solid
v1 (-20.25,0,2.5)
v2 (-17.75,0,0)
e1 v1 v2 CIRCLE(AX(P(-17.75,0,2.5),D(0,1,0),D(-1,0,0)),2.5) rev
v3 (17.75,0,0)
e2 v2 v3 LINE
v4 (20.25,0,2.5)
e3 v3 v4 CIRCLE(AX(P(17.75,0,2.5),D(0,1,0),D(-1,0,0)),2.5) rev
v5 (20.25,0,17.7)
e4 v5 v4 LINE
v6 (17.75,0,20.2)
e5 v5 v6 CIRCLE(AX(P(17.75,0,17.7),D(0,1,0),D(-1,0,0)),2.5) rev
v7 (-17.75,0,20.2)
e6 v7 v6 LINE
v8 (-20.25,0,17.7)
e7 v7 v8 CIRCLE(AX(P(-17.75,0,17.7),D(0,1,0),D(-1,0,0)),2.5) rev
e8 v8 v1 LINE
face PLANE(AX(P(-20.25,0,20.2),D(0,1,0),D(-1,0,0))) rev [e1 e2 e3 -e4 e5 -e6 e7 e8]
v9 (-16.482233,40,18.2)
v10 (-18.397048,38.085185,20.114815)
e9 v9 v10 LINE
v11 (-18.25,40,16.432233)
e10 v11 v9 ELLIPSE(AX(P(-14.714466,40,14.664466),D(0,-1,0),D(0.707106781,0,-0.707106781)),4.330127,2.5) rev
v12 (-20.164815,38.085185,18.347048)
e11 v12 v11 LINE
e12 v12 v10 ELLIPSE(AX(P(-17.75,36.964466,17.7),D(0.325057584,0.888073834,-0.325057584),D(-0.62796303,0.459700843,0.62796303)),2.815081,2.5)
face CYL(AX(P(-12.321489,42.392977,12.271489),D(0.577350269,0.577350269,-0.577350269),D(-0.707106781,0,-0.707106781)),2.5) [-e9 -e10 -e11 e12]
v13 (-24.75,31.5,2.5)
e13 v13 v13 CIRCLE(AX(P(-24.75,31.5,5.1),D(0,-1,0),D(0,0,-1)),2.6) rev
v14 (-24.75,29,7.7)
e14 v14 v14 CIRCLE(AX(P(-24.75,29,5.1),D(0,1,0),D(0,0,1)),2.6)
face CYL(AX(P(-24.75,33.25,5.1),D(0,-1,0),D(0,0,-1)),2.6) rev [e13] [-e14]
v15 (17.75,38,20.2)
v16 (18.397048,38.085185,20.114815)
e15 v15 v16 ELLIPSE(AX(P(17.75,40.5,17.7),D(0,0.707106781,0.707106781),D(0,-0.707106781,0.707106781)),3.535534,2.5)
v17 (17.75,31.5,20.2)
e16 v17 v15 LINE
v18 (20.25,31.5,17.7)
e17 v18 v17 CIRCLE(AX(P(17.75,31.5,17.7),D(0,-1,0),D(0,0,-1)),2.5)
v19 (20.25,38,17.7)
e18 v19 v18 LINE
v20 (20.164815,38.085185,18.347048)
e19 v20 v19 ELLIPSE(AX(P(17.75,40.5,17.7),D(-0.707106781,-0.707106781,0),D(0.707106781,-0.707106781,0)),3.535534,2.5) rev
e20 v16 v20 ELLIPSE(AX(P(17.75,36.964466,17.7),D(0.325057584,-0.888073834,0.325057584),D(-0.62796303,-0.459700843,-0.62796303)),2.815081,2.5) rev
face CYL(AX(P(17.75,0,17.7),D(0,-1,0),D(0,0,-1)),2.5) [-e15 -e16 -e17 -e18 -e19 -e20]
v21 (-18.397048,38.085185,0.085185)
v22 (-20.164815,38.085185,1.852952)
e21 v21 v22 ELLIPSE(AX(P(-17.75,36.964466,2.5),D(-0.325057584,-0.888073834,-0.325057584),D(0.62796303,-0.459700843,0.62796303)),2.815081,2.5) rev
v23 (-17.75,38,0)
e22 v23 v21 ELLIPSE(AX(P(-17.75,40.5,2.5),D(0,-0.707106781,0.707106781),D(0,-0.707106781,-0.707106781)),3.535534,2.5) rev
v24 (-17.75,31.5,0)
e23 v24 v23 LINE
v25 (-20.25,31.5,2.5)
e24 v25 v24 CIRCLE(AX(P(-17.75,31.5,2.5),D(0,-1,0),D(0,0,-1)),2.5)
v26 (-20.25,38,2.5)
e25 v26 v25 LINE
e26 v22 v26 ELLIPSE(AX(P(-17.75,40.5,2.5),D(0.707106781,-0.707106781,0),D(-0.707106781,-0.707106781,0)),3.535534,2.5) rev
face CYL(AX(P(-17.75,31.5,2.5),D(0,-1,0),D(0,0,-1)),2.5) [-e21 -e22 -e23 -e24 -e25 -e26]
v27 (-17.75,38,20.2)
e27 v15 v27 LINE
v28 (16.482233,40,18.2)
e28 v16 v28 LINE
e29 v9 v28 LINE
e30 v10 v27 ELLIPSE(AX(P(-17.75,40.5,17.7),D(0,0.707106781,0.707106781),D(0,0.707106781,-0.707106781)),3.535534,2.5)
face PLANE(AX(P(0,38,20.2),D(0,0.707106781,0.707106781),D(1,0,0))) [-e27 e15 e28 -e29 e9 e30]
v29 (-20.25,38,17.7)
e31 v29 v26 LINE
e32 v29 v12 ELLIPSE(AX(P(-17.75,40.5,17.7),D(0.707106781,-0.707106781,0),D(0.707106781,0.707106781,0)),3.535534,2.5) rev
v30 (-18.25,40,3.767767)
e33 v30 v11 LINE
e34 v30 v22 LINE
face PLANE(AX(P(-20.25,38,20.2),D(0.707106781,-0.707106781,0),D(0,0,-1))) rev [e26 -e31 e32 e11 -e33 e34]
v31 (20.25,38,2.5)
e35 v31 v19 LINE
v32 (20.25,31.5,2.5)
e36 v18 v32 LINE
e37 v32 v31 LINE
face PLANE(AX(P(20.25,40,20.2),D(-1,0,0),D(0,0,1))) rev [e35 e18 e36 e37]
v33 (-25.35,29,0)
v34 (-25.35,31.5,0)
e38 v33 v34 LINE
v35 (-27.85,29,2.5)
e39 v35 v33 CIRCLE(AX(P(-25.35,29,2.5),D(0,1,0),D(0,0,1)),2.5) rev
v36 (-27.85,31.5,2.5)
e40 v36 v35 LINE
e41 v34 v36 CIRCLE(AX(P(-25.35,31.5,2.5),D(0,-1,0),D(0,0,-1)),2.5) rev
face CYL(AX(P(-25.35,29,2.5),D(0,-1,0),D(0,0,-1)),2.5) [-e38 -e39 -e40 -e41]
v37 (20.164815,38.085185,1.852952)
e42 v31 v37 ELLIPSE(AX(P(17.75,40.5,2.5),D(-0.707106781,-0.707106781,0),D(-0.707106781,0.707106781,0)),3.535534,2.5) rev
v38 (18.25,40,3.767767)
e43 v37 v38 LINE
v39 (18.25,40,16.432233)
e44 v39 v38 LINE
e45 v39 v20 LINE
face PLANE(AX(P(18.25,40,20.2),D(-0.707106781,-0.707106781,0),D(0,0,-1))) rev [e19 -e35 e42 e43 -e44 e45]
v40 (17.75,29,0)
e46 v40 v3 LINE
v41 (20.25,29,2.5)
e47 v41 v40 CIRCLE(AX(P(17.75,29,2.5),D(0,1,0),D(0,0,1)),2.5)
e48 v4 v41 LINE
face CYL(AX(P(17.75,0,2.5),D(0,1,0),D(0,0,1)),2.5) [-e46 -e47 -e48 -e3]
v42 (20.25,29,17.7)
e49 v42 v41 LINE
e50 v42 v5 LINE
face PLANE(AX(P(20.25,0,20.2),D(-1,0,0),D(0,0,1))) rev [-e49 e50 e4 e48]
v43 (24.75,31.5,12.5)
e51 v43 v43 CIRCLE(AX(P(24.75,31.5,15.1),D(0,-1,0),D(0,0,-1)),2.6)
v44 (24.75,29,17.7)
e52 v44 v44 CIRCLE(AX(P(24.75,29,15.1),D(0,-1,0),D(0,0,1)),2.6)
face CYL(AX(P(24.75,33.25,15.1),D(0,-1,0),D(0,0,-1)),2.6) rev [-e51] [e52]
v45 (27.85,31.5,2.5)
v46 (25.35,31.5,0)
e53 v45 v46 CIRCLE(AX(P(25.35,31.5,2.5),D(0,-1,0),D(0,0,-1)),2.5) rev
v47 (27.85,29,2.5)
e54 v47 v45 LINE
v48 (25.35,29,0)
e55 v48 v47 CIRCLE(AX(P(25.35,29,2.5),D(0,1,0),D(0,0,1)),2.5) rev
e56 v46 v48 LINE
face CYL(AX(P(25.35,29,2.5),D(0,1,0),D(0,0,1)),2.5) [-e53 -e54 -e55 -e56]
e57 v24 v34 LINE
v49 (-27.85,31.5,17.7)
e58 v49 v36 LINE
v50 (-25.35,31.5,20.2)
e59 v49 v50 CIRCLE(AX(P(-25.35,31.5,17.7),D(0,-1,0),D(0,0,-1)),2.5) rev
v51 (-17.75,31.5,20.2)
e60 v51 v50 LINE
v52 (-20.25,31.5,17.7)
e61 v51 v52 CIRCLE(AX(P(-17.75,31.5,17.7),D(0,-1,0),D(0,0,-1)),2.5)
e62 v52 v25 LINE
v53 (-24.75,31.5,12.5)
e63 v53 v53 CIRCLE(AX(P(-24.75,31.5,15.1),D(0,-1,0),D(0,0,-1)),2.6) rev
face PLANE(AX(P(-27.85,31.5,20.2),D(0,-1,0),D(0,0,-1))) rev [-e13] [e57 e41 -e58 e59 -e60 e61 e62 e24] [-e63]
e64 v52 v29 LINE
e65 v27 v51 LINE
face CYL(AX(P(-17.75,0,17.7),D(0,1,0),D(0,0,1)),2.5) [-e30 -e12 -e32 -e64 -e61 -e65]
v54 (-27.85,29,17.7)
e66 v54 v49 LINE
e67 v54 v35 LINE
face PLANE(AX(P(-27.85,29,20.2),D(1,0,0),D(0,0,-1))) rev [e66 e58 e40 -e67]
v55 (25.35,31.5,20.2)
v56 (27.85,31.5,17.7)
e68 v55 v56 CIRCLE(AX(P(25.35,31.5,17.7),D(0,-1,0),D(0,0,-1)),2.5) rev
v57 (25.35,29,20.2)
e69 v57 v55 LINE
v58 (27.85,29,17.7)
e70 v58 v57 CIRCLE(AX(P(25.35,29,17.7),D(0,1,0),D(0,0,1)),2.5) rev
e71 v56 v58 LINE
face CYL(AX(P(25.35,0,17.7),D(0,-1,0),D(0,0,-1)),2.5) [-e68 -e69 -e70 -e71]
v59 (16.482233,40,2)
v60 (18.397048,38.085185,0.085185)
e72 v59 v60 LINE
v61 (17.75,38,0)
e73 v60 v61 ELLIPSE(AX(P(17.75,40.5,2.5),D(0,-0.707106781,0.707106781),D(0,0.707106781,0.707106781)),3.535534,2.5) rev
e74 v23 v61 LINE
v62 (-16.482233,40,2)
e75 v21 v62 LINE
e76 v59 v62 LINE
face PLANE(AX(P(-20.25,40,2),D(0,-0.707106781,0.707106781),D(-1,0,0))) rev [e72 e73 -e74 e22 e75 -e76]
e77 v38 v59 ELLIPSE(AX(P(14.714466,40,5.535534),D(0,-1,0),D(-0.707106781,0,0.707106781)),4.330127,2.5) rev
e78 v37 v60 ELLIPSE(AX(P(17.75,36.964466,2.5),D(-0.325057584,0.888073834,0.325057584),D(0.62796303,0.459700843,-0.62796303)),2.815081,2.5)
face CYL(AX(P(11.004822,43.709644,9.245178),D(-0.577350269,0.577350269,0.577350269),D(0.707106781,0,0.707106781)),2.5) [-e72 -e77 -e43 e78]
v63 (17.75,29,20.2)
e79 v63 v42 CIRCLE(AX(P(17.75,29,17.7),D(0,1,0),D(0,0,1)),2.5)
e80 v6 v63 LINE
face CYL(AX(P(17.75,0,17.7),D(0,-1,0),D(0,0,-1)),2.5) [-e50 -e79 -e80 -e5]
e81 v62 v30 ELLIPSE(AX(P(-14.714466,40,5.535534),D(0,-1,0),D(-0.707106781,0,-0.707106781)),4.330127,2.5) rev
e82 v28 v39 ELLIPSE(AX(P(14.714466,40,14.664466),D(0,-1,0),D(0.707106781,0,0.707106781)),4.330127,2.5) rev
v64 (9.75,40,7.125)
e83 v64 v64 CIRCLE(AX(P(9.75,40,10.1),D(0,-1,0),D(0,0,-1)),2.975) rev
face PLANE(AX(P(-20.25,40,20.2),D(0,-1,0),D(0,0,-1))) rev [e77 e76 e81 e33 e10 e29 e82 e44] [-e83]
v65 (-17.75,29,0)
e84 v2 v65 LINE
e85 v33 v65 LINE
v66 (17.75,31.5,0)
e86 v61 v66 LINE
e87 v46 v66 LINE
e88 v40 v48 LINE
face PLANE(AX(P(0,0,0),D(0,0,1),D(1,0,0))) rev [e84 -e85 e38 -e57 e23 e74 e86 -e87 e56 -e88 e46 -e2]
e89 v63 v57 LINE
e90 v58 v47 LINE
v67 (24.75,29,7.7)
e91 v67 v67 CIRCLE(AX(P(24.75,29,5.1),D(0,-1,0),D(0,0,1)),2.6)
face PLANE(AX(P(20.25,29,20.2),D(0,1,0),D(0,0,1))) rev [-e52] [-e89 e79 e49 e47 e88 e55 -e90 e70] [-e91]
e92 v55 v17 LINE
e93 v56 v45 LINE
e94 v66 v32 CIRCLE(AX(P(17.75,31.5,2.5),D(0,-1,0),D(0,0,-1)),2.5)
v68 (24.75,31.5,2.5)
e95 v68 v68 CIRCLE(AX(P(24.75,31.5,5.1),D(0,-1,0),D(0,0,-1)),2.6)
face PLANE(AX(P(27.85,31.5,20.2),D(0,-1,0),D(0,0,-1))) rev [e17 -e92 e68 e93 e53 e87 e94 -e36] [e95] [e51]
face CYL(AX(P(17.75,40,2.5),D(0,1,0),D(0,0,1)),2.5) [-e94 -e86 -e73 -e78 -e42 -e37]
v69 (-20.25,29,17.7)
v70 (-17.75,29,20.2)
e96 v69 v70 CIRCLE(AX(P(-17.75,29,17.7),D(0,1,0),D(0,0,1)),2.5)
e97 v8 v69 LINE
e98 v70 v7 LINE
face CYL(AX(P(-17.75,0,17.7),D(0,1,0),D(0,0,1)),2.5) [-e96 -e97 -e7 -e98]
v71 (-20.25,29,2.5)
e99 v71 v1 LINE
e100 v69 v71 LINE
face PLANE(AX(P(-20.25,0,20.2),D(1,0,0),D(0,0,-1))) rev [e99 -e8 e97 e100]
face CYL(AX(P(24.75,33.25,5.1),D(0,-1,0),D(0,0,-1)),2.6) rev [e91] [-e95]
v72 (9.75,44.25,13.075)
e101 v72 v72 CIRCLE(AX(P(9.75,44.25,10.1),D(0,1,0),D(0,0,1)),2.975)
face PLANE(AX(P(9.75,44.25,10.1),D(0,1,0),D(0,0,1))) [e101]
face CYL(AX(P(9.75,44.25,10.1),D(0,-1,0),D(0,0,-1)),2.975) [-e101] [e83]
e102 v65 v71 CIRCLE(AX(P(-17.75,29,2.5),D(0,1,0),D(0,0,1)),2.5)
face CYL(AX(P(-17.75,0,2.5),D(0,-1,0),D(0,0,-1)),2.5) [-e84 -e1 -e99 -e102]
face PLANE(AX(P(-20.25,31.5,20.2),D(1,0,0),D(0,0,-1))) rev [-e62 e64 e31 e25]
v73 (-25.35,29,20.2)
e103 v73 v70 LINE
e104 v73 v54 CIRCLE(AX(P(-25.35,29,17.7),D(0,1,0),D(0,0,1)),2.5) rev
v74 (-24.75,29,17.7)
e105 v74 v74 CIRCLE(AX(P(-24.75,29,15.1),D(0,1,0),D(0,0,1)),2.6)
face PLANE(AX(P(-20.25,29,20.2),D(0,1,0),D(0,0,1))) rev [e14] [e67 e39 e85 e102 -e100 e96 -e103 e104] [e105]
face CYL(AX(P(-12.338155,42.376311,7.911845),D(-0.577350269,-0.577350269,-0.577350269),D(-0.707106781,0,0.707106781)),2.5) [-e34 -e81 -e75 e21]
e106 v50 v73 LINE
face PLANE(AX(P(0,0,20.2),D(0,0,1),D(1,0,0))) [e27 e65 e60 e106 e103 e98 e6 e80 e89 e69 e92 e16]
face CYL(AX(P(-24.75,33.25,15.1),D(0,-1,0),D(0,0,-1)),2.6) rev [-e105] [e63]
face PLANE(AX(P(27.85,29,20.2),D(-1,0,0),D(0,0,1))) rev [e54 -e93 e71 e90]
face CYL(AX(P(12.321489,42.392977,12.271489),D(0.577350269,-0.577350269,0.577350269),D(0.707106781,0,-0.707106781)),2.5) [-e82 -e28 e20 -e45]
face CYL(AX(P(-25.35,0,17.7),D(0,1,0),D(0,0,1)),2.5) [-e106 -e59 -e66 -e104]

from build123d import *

# Parameters (mm, degrees)
BOSS_EXTRUDE1_DEPTH = 20.2
SKETCH2_R           = 2.975
BOSS_EXTRUDE2_DEPTH = 4.25
CUT_EXTRUDE1_START  = 29
SKETCH3_R           = 2.6
CUT_EXTRUDE1_DEPTH  = 4.25
CHAMFER1_SIZE       = 2
FILLET1_R           = 2.5


with BuildPart() as part:
    # Sketch1 → Boss-Extrude1 (new body)
    with BuildSketch(Plane.XY):
        Polygon((-20.25, 0), (20.25, 0), (20.25, 29), (27.85, 29), (27.85, 31.5), (20.25, 31.5), (20.25, 40), (-20.25, 40), (-20.25, 31.5), (-27.85, 31.5), (-27.85, 29), (-20.25, 29), align=None)
    extrude(amount=BOSS_EXTRUDE1_DEPTH)

    # Sketch2 → Boss-Extrude2 (add)
    with BuildSketch(Plane(origin=(0, 40, 0), x_dir=(1, 0, 0), z_dir=(0, 1, 0))):
        with Locations(Location((9.75, -10.1, 0), (0, 0, 90))):
            Circle(SKETCH2_R)
    extrude(amount=BOSS_EXTRUDE2_DEPTH)

    # Sketch3 → Cut-Extrude1 (cut)
    with BuildSketch(Plane(origin=(0, 0, 0), x_dir=(1, 0, 0), z_dir=(0, 1, 0)).offset(CUT_EXTRUDE1_START)):
        with Locations(Location((-24.75, -5.1, 0), (0, 0, 90))):
            Circle(SKETCH3_R)
        with Locations(Location((-24.75, -15.1, 0), (0, 0, 90))):
            Circle(SKETCH3_R)
    cut_extrude1 = extrude(amount=CUT_EXTRUDE1_DEPTH, mode=Mode.SUBTRACT)

    # Mirror1: Cut-Extrude1 across plane
    add(cut_extrude1.mirror(Plane(origin=(0, 0, 0), x_dir=(0, 0, 1), z_dir=(1, 0, 0))), mode=Mode.SUBTRACT)

    # Chamfer1
    chamfer1_edges = [part.edges().sort_by_distance(p)[0] for p in [
        (0, 40, 0),
        (0, 40, 20.2),
        (-20.25, 40, 10.1),
        (20.25, 40, 10.1),
    ]]
    chamfer(chamfer1_edges, length=CHAMFER1_SIZE)

    # Fillet1
    # the kernel refuses this fillet: 2.5 mm, written as the material it takes off along each edge
    with BuildSketch(Plane(origin=(20.25, -6.25, 0), x_dir=(-1, 0, 0), z_dir=(0, 1, 0)), Plane(origin=(-20.25, 29, 0), x_dir=(1, 0, 0), z_dir=(0, -1, 0)), Plane(origin=(-20.25, 29, 20.2), x_dir=(0, 0, -1), z_dir=(0, -1, 0)), Plane(origin=(20.25, -6.25, 20.2), x_dir=(0, 0, -1), z_dir=(0, 1, 0))) as fillet1_piece_1:
        with BuildLine():
            CenterArc((FILLET1_R, FILLET1_R), FILLET1_R, 180, 90)
            Line((0, FILLET1_R), (0, 0))
            Line((0, 0), (FILLET1_R, 0))
        make_face()
    extrude(amount=35.25, mode=Mode.SUBTRACT)
    with BuildSketch(Plane(origin=(20.25, -6.25, 0), x_dir=(-1, 0, 0), z_dir=(0, 1, 0))) as fillet1_piece_2_section:
        with BuildLine():
            CenterArc((FILLET1_R, FILLET1_R), FILLET1_R, 180, 90)
            Line((0, FILLET1_R), (0, 0))
            Line((0, 0), (FILLET1_R, 0))
        make_face()
    fillet1_piece_2 = extrude(amount=41.5, mode=Mode.PRIVATE)
    fillet1_piece_2 = split(fillet1_piece_2, bisect_by=Plane(origin=(19.684012214, 31.5, 0.565987786), z_dir=(0, 1, 0)), keep=Keep.TOP, mode=Mode.PRIVATE)
    add(fillet1_piece_2, mode=Mode.SUBTRACT)
    with BuildSketch(Plane(origin=(-20.25, 35.25, 0), x_dir=(1, 0, 0), z_dir=(0, -1, 0))) as fillet1_piece_3_section:
        with BuildLine():
            CenterArc((FILLET1_R, FILLET1_R), FILLET1_R, 180, 90)
            Line((0, FILLET1_R), (0, 0))
            Line((0, 0), (FILLET1_R, 0))
        make_face()
    fillet1_piece_3 = extrude(amount=41.5, mode=Mode.PRIVATE)
    fillet1_piece_3 = split(fillet1_piece_3, bisect_by=Plane(origin=(-19.684012214, 31.5, 0.565987786), z_dir=(0, 1, 0)), keep=Keep.TOP, mode=Mode.PRIVATE)
    add(fillet1_piece_3, mode=Mode.SUBTRACT)
    with BuildSketch(Plane(origin=(-27.85, 37.75, 0), x_dir=(1, 0, 0), z_dir=(0, -1, 0)), Plane(origin=(27.85, 22.75, 0), x_dir=(-1, 0, 0), z_dir=(0, 1, 0)), Plane(origin=(-27.85, 37.75, 20.2), x_dir=(0, 0, -1), z_dir=(0, -1, 0)), Plane(origin=(27.85, 22.75, 20.2), x_dir=(0, 0, -1), z_dir=(0, 1, 0))) as fillet1_piece_4:
        with BuildLine():
            CenterArc((FILLET1_R, FILLET1_R), FILLET1_R, 180, 90)
            Line((0, FILLET1_R), (0, 0))
            Line((0, 0), (FILLET1_R, 0))
        make_face()
    extrude(amount=15, mode=Mode.SUBTRACT)
    with BuildSketch(Plane(origin=(20.25, 25.25, 0), x_dir=(-1, 0, 0), z_dir=(0, 1, 0))) as fillet1_piece_5_section:
        with BuildLine():
            CenterArc((FILLET1_R, FILLET1_R), FILLET1_R, 180, 90)
            Line((0, FILLET1_R), (0, 0))
            Line((0, 0), (FILLET1_R, 0))
        make_face()
    fillet1_piece_5 = extrude(amount=19, mode=Mode.PRIVATE)
    fillet1_piece_5 = split(fillet1_piece_5, bisect_by=Plane(origin=(19.684012214, 29, 0.565987786), z_dir=(0, -1, 0)), keep=Keep.TOP, mode=Mode.PRIVATE)
    add(fillet1_piece_5, mode=Mode.SUBTRACT)
    with BuildSketch(Plane(origin=(20.25, 31.5, 0), x_dir=(-1, 0, 0), z_dir=(0, 1, 0)), Plane(origin=(20.25, 31.5, 20.2), x_dir=(0, 0, -1), z_dir=(0, 1, 0)), Plane(origin=(-20.25, 44.25, 20.2), x_dir=(0, 0, -1), z_dir=(0, -1, 0)), Plane(origin=(-20.25, 44.25, 0), x_dir=(1, 0, 0), z_dir=(0, -1, 0))) as fillet1_piece_6:
        with BuildLine():
            CenterArc((FILLET1_R, FILLET1_R), FILLET1_R, 180, 90)
            Line((0, FILLET1_R), (0, 0))
            Line((0, 0), (FILLET1_R, 0))
        make_face()
    extrude(amount=12.75, mode=Mode.SUBTRACT)
    with BuildSketch(Plane(origin=(20.25, 25.25, 20.2), x_dir=(0, 0, -1), z_dir=(0, 1, 0))) as fillet1_piece_7_section:
        with BuildLine():
            CenterArc((FILLET1_R, FILLET1_R), FILLET1_R, 180, 90)
            Line((0, FILLET1_R), (0, 0))
            Line((0, 0), (FILLET1_R, 0))
        make_face()
    fillet1_piece_7 = extrude(amount=19, mode=Mode.PRIVATE)
    fillet1_piece_7 = split(fillet1_piece_7, bisect_by=Plane(origin=(19.684012214, 29, 19.634012214), z_dir=(0, -1, 0)), keep=Keep.TOP, mode=Mode.PRIVATE)
    add(fillet1_piece_7, mode=Mode.SUBTRACT)
    with BuildSketch(Plane(origin=(-20.25, 35.25, 20.2), x_dir=(0, 0, -1), z_dir=(0, -1, 0))) as fillet1_piece_8_section:
        with BuildLine():
            CenterArc((FILLET1_R, FILLET1_R), FILLET1_R, 180, 90)
            Line((0, FILLET1_R), (0, 0))
            Line((0, 0), (FILLET1_R, 0))
        make_face()
    fillet1_piece_8 = extrude(amount=41.5, mode=Mode.PRIVATE)
    fillet1_piece_8 = split(fillet1_piece_8, bisect_by=Plane(origin=(-19.684012214, 31.5, 19.634012214), z_dir=(0, 1, 0)), keep=Keep.TOP, mode=Mode.PRIVATE)
    add(fillet1_piece_8, mode=Mode.SUBTRACT)
    with BuildSketch(Plane(origin=(20.25, -6.25, 20.2), x_dir=(0, 0, -1), z_dir=(0, 1, 0))) as fillet1_piece_9_section:
        with BuildLine():
            CenterArc((FILLET1_R, FILLET1_R), FILLET1_R, 180, 90)
            Line((0, FILLET1_R), (0, 0))
            Line((0, 0), (FILLET1_R, 0))
        make_face()
    fillet1_piece_9 = extrude(amount=41.5, mode=Mode.PRIVATE)
    fillet1_piece_9 = split(fillet1_piece_9, bisect_by=Plane(origin=(19.684012214, 31.5, 19.634012214), z_dir=(0, 1, 0)), keep=Keep.TOP, mode=Mode.PRIVATE)
    add(fillet1_piece_9, mode=Mode.SUBTRACT)
    with BuildSketch(Plane(origin=(-20.25, 44.25, 20.2), x_dir=(0, 0, -1), z_dir=(0, -1, 0))) as fillet1_piece_10_section:
        with BuildLine():
            CenterArc((FILLET1_R, FILLET1_R), FILLET1_R, 180, 90)
            Line((0, FILLET1_R), (0, 0))
            Line((0, 0), (FILLET1_R, 0))
        make_face()
    fillet1_piece_10 = extrude(amount=19, mode=Mode.PRIVATE)
    fillet1_piece_10 = split(fillet1_piece_10, bisect_by=Plane(origin=(-19.684012214, 29, 19.634012214), z_dir=(0, -1, 0)), keep=Keep.TOP, mode=Mode.PRIVATE)
    add(fillet1_piece_10, mode=Mode.SUBTRACT)
    with BuildSketch(Plane(origin=(-20.25, 44.25, 0), x_dir=(1, 0, 0), z_dir=(0, -1, 0))) as fillet1_piece_11_section:
        with BuildLine():
            CenterArc((FILLET1_R, FILLET1_R), FILLET1_R, 180, 90)
            Line((0, FILLET1_R), (0, 0))
            Line((0, 0), (FILLET1_R, 0))
        make_face()
    fillet1_piece_11 = extrude(amount=19, mode=Mode.PRIVATE)
    fillet1_piece_11 = split(fillet1_piece_11, bisect_by=Plane(origin=(-19.684012214, 29, 0.565987786), z_dir=(0, -1, 0)), keep=Keep.TOP, mode=Mode.PRIVATE)
    add(fillet1_piece_11, mode=Mode.SUBTRACT)
    with BuildSketch(Plane(origin=(22.333333333, 35.916666667, -2.083333333), x_dir=(-0.816496580927726, -0.4082482904638627, -0.4082482904638633), z_dir=(-0.5773502691896258, 0.5773502691896258, 0.5773502691896258)), Plane(origin=(22.333333333, 35.916666667, 22.283333333), x_dir=(0.40824829046386174, -0.4082482904638642, -0.8164965809277261), z_dir=(-0.5773502691896258, 0.5773502691896258, -0.5773502691896258))) as fillet1_piece_12:
        with BuildLine():
            CenterArc((FILLET1_R * 0.57735026919, FILLET1_R), FILLET1_R, 210, 60)
            Line((-FILLET1_R * 0.288675134595, FILLET1_R * 0.5), (0, 0))
            Line((0, 0), (FILLET1_R * 0.57735026919, 0))
        make_face()
    extrude(amount=10.68097998, mode=Mode.SUBTRACT)
    with BuildSketch(Plane(origin=(-22.333333333, 35.916666667, -2.083333333), x_dir=(0.8164965809277259, -0.4082482904638622, -0.40824829046386374), z_dir=(0.5773502691896258, 0.5773502691896258, 0.5773502691896258)), Plane(origin=(-22.333333333, 35.916666667, 22.283333333), x_dir=(-0.40824829046386424, -0.4082482904638618, -0.816496580927726), z_dir=(0.5773502691896258, 0.5773502691896258, -0.5773502691896258))) as fillet1_piece_13:
        with BuildLine():
            CenterArc((FILLET1_R * 0.57735026919, -FILLET1_R), FILLET1_R, 90, 60)
            Line((-FILLET1_R * 0.288675134595, -FILLET1_R * 0.5), (0, 0))
            Line((0, 0), (FILLET1_R * 0.57735026919, 0))
        make_face()
    extrude(amount=10.68097998, mode=Mode.SUBTRACT)


solid = part.part
